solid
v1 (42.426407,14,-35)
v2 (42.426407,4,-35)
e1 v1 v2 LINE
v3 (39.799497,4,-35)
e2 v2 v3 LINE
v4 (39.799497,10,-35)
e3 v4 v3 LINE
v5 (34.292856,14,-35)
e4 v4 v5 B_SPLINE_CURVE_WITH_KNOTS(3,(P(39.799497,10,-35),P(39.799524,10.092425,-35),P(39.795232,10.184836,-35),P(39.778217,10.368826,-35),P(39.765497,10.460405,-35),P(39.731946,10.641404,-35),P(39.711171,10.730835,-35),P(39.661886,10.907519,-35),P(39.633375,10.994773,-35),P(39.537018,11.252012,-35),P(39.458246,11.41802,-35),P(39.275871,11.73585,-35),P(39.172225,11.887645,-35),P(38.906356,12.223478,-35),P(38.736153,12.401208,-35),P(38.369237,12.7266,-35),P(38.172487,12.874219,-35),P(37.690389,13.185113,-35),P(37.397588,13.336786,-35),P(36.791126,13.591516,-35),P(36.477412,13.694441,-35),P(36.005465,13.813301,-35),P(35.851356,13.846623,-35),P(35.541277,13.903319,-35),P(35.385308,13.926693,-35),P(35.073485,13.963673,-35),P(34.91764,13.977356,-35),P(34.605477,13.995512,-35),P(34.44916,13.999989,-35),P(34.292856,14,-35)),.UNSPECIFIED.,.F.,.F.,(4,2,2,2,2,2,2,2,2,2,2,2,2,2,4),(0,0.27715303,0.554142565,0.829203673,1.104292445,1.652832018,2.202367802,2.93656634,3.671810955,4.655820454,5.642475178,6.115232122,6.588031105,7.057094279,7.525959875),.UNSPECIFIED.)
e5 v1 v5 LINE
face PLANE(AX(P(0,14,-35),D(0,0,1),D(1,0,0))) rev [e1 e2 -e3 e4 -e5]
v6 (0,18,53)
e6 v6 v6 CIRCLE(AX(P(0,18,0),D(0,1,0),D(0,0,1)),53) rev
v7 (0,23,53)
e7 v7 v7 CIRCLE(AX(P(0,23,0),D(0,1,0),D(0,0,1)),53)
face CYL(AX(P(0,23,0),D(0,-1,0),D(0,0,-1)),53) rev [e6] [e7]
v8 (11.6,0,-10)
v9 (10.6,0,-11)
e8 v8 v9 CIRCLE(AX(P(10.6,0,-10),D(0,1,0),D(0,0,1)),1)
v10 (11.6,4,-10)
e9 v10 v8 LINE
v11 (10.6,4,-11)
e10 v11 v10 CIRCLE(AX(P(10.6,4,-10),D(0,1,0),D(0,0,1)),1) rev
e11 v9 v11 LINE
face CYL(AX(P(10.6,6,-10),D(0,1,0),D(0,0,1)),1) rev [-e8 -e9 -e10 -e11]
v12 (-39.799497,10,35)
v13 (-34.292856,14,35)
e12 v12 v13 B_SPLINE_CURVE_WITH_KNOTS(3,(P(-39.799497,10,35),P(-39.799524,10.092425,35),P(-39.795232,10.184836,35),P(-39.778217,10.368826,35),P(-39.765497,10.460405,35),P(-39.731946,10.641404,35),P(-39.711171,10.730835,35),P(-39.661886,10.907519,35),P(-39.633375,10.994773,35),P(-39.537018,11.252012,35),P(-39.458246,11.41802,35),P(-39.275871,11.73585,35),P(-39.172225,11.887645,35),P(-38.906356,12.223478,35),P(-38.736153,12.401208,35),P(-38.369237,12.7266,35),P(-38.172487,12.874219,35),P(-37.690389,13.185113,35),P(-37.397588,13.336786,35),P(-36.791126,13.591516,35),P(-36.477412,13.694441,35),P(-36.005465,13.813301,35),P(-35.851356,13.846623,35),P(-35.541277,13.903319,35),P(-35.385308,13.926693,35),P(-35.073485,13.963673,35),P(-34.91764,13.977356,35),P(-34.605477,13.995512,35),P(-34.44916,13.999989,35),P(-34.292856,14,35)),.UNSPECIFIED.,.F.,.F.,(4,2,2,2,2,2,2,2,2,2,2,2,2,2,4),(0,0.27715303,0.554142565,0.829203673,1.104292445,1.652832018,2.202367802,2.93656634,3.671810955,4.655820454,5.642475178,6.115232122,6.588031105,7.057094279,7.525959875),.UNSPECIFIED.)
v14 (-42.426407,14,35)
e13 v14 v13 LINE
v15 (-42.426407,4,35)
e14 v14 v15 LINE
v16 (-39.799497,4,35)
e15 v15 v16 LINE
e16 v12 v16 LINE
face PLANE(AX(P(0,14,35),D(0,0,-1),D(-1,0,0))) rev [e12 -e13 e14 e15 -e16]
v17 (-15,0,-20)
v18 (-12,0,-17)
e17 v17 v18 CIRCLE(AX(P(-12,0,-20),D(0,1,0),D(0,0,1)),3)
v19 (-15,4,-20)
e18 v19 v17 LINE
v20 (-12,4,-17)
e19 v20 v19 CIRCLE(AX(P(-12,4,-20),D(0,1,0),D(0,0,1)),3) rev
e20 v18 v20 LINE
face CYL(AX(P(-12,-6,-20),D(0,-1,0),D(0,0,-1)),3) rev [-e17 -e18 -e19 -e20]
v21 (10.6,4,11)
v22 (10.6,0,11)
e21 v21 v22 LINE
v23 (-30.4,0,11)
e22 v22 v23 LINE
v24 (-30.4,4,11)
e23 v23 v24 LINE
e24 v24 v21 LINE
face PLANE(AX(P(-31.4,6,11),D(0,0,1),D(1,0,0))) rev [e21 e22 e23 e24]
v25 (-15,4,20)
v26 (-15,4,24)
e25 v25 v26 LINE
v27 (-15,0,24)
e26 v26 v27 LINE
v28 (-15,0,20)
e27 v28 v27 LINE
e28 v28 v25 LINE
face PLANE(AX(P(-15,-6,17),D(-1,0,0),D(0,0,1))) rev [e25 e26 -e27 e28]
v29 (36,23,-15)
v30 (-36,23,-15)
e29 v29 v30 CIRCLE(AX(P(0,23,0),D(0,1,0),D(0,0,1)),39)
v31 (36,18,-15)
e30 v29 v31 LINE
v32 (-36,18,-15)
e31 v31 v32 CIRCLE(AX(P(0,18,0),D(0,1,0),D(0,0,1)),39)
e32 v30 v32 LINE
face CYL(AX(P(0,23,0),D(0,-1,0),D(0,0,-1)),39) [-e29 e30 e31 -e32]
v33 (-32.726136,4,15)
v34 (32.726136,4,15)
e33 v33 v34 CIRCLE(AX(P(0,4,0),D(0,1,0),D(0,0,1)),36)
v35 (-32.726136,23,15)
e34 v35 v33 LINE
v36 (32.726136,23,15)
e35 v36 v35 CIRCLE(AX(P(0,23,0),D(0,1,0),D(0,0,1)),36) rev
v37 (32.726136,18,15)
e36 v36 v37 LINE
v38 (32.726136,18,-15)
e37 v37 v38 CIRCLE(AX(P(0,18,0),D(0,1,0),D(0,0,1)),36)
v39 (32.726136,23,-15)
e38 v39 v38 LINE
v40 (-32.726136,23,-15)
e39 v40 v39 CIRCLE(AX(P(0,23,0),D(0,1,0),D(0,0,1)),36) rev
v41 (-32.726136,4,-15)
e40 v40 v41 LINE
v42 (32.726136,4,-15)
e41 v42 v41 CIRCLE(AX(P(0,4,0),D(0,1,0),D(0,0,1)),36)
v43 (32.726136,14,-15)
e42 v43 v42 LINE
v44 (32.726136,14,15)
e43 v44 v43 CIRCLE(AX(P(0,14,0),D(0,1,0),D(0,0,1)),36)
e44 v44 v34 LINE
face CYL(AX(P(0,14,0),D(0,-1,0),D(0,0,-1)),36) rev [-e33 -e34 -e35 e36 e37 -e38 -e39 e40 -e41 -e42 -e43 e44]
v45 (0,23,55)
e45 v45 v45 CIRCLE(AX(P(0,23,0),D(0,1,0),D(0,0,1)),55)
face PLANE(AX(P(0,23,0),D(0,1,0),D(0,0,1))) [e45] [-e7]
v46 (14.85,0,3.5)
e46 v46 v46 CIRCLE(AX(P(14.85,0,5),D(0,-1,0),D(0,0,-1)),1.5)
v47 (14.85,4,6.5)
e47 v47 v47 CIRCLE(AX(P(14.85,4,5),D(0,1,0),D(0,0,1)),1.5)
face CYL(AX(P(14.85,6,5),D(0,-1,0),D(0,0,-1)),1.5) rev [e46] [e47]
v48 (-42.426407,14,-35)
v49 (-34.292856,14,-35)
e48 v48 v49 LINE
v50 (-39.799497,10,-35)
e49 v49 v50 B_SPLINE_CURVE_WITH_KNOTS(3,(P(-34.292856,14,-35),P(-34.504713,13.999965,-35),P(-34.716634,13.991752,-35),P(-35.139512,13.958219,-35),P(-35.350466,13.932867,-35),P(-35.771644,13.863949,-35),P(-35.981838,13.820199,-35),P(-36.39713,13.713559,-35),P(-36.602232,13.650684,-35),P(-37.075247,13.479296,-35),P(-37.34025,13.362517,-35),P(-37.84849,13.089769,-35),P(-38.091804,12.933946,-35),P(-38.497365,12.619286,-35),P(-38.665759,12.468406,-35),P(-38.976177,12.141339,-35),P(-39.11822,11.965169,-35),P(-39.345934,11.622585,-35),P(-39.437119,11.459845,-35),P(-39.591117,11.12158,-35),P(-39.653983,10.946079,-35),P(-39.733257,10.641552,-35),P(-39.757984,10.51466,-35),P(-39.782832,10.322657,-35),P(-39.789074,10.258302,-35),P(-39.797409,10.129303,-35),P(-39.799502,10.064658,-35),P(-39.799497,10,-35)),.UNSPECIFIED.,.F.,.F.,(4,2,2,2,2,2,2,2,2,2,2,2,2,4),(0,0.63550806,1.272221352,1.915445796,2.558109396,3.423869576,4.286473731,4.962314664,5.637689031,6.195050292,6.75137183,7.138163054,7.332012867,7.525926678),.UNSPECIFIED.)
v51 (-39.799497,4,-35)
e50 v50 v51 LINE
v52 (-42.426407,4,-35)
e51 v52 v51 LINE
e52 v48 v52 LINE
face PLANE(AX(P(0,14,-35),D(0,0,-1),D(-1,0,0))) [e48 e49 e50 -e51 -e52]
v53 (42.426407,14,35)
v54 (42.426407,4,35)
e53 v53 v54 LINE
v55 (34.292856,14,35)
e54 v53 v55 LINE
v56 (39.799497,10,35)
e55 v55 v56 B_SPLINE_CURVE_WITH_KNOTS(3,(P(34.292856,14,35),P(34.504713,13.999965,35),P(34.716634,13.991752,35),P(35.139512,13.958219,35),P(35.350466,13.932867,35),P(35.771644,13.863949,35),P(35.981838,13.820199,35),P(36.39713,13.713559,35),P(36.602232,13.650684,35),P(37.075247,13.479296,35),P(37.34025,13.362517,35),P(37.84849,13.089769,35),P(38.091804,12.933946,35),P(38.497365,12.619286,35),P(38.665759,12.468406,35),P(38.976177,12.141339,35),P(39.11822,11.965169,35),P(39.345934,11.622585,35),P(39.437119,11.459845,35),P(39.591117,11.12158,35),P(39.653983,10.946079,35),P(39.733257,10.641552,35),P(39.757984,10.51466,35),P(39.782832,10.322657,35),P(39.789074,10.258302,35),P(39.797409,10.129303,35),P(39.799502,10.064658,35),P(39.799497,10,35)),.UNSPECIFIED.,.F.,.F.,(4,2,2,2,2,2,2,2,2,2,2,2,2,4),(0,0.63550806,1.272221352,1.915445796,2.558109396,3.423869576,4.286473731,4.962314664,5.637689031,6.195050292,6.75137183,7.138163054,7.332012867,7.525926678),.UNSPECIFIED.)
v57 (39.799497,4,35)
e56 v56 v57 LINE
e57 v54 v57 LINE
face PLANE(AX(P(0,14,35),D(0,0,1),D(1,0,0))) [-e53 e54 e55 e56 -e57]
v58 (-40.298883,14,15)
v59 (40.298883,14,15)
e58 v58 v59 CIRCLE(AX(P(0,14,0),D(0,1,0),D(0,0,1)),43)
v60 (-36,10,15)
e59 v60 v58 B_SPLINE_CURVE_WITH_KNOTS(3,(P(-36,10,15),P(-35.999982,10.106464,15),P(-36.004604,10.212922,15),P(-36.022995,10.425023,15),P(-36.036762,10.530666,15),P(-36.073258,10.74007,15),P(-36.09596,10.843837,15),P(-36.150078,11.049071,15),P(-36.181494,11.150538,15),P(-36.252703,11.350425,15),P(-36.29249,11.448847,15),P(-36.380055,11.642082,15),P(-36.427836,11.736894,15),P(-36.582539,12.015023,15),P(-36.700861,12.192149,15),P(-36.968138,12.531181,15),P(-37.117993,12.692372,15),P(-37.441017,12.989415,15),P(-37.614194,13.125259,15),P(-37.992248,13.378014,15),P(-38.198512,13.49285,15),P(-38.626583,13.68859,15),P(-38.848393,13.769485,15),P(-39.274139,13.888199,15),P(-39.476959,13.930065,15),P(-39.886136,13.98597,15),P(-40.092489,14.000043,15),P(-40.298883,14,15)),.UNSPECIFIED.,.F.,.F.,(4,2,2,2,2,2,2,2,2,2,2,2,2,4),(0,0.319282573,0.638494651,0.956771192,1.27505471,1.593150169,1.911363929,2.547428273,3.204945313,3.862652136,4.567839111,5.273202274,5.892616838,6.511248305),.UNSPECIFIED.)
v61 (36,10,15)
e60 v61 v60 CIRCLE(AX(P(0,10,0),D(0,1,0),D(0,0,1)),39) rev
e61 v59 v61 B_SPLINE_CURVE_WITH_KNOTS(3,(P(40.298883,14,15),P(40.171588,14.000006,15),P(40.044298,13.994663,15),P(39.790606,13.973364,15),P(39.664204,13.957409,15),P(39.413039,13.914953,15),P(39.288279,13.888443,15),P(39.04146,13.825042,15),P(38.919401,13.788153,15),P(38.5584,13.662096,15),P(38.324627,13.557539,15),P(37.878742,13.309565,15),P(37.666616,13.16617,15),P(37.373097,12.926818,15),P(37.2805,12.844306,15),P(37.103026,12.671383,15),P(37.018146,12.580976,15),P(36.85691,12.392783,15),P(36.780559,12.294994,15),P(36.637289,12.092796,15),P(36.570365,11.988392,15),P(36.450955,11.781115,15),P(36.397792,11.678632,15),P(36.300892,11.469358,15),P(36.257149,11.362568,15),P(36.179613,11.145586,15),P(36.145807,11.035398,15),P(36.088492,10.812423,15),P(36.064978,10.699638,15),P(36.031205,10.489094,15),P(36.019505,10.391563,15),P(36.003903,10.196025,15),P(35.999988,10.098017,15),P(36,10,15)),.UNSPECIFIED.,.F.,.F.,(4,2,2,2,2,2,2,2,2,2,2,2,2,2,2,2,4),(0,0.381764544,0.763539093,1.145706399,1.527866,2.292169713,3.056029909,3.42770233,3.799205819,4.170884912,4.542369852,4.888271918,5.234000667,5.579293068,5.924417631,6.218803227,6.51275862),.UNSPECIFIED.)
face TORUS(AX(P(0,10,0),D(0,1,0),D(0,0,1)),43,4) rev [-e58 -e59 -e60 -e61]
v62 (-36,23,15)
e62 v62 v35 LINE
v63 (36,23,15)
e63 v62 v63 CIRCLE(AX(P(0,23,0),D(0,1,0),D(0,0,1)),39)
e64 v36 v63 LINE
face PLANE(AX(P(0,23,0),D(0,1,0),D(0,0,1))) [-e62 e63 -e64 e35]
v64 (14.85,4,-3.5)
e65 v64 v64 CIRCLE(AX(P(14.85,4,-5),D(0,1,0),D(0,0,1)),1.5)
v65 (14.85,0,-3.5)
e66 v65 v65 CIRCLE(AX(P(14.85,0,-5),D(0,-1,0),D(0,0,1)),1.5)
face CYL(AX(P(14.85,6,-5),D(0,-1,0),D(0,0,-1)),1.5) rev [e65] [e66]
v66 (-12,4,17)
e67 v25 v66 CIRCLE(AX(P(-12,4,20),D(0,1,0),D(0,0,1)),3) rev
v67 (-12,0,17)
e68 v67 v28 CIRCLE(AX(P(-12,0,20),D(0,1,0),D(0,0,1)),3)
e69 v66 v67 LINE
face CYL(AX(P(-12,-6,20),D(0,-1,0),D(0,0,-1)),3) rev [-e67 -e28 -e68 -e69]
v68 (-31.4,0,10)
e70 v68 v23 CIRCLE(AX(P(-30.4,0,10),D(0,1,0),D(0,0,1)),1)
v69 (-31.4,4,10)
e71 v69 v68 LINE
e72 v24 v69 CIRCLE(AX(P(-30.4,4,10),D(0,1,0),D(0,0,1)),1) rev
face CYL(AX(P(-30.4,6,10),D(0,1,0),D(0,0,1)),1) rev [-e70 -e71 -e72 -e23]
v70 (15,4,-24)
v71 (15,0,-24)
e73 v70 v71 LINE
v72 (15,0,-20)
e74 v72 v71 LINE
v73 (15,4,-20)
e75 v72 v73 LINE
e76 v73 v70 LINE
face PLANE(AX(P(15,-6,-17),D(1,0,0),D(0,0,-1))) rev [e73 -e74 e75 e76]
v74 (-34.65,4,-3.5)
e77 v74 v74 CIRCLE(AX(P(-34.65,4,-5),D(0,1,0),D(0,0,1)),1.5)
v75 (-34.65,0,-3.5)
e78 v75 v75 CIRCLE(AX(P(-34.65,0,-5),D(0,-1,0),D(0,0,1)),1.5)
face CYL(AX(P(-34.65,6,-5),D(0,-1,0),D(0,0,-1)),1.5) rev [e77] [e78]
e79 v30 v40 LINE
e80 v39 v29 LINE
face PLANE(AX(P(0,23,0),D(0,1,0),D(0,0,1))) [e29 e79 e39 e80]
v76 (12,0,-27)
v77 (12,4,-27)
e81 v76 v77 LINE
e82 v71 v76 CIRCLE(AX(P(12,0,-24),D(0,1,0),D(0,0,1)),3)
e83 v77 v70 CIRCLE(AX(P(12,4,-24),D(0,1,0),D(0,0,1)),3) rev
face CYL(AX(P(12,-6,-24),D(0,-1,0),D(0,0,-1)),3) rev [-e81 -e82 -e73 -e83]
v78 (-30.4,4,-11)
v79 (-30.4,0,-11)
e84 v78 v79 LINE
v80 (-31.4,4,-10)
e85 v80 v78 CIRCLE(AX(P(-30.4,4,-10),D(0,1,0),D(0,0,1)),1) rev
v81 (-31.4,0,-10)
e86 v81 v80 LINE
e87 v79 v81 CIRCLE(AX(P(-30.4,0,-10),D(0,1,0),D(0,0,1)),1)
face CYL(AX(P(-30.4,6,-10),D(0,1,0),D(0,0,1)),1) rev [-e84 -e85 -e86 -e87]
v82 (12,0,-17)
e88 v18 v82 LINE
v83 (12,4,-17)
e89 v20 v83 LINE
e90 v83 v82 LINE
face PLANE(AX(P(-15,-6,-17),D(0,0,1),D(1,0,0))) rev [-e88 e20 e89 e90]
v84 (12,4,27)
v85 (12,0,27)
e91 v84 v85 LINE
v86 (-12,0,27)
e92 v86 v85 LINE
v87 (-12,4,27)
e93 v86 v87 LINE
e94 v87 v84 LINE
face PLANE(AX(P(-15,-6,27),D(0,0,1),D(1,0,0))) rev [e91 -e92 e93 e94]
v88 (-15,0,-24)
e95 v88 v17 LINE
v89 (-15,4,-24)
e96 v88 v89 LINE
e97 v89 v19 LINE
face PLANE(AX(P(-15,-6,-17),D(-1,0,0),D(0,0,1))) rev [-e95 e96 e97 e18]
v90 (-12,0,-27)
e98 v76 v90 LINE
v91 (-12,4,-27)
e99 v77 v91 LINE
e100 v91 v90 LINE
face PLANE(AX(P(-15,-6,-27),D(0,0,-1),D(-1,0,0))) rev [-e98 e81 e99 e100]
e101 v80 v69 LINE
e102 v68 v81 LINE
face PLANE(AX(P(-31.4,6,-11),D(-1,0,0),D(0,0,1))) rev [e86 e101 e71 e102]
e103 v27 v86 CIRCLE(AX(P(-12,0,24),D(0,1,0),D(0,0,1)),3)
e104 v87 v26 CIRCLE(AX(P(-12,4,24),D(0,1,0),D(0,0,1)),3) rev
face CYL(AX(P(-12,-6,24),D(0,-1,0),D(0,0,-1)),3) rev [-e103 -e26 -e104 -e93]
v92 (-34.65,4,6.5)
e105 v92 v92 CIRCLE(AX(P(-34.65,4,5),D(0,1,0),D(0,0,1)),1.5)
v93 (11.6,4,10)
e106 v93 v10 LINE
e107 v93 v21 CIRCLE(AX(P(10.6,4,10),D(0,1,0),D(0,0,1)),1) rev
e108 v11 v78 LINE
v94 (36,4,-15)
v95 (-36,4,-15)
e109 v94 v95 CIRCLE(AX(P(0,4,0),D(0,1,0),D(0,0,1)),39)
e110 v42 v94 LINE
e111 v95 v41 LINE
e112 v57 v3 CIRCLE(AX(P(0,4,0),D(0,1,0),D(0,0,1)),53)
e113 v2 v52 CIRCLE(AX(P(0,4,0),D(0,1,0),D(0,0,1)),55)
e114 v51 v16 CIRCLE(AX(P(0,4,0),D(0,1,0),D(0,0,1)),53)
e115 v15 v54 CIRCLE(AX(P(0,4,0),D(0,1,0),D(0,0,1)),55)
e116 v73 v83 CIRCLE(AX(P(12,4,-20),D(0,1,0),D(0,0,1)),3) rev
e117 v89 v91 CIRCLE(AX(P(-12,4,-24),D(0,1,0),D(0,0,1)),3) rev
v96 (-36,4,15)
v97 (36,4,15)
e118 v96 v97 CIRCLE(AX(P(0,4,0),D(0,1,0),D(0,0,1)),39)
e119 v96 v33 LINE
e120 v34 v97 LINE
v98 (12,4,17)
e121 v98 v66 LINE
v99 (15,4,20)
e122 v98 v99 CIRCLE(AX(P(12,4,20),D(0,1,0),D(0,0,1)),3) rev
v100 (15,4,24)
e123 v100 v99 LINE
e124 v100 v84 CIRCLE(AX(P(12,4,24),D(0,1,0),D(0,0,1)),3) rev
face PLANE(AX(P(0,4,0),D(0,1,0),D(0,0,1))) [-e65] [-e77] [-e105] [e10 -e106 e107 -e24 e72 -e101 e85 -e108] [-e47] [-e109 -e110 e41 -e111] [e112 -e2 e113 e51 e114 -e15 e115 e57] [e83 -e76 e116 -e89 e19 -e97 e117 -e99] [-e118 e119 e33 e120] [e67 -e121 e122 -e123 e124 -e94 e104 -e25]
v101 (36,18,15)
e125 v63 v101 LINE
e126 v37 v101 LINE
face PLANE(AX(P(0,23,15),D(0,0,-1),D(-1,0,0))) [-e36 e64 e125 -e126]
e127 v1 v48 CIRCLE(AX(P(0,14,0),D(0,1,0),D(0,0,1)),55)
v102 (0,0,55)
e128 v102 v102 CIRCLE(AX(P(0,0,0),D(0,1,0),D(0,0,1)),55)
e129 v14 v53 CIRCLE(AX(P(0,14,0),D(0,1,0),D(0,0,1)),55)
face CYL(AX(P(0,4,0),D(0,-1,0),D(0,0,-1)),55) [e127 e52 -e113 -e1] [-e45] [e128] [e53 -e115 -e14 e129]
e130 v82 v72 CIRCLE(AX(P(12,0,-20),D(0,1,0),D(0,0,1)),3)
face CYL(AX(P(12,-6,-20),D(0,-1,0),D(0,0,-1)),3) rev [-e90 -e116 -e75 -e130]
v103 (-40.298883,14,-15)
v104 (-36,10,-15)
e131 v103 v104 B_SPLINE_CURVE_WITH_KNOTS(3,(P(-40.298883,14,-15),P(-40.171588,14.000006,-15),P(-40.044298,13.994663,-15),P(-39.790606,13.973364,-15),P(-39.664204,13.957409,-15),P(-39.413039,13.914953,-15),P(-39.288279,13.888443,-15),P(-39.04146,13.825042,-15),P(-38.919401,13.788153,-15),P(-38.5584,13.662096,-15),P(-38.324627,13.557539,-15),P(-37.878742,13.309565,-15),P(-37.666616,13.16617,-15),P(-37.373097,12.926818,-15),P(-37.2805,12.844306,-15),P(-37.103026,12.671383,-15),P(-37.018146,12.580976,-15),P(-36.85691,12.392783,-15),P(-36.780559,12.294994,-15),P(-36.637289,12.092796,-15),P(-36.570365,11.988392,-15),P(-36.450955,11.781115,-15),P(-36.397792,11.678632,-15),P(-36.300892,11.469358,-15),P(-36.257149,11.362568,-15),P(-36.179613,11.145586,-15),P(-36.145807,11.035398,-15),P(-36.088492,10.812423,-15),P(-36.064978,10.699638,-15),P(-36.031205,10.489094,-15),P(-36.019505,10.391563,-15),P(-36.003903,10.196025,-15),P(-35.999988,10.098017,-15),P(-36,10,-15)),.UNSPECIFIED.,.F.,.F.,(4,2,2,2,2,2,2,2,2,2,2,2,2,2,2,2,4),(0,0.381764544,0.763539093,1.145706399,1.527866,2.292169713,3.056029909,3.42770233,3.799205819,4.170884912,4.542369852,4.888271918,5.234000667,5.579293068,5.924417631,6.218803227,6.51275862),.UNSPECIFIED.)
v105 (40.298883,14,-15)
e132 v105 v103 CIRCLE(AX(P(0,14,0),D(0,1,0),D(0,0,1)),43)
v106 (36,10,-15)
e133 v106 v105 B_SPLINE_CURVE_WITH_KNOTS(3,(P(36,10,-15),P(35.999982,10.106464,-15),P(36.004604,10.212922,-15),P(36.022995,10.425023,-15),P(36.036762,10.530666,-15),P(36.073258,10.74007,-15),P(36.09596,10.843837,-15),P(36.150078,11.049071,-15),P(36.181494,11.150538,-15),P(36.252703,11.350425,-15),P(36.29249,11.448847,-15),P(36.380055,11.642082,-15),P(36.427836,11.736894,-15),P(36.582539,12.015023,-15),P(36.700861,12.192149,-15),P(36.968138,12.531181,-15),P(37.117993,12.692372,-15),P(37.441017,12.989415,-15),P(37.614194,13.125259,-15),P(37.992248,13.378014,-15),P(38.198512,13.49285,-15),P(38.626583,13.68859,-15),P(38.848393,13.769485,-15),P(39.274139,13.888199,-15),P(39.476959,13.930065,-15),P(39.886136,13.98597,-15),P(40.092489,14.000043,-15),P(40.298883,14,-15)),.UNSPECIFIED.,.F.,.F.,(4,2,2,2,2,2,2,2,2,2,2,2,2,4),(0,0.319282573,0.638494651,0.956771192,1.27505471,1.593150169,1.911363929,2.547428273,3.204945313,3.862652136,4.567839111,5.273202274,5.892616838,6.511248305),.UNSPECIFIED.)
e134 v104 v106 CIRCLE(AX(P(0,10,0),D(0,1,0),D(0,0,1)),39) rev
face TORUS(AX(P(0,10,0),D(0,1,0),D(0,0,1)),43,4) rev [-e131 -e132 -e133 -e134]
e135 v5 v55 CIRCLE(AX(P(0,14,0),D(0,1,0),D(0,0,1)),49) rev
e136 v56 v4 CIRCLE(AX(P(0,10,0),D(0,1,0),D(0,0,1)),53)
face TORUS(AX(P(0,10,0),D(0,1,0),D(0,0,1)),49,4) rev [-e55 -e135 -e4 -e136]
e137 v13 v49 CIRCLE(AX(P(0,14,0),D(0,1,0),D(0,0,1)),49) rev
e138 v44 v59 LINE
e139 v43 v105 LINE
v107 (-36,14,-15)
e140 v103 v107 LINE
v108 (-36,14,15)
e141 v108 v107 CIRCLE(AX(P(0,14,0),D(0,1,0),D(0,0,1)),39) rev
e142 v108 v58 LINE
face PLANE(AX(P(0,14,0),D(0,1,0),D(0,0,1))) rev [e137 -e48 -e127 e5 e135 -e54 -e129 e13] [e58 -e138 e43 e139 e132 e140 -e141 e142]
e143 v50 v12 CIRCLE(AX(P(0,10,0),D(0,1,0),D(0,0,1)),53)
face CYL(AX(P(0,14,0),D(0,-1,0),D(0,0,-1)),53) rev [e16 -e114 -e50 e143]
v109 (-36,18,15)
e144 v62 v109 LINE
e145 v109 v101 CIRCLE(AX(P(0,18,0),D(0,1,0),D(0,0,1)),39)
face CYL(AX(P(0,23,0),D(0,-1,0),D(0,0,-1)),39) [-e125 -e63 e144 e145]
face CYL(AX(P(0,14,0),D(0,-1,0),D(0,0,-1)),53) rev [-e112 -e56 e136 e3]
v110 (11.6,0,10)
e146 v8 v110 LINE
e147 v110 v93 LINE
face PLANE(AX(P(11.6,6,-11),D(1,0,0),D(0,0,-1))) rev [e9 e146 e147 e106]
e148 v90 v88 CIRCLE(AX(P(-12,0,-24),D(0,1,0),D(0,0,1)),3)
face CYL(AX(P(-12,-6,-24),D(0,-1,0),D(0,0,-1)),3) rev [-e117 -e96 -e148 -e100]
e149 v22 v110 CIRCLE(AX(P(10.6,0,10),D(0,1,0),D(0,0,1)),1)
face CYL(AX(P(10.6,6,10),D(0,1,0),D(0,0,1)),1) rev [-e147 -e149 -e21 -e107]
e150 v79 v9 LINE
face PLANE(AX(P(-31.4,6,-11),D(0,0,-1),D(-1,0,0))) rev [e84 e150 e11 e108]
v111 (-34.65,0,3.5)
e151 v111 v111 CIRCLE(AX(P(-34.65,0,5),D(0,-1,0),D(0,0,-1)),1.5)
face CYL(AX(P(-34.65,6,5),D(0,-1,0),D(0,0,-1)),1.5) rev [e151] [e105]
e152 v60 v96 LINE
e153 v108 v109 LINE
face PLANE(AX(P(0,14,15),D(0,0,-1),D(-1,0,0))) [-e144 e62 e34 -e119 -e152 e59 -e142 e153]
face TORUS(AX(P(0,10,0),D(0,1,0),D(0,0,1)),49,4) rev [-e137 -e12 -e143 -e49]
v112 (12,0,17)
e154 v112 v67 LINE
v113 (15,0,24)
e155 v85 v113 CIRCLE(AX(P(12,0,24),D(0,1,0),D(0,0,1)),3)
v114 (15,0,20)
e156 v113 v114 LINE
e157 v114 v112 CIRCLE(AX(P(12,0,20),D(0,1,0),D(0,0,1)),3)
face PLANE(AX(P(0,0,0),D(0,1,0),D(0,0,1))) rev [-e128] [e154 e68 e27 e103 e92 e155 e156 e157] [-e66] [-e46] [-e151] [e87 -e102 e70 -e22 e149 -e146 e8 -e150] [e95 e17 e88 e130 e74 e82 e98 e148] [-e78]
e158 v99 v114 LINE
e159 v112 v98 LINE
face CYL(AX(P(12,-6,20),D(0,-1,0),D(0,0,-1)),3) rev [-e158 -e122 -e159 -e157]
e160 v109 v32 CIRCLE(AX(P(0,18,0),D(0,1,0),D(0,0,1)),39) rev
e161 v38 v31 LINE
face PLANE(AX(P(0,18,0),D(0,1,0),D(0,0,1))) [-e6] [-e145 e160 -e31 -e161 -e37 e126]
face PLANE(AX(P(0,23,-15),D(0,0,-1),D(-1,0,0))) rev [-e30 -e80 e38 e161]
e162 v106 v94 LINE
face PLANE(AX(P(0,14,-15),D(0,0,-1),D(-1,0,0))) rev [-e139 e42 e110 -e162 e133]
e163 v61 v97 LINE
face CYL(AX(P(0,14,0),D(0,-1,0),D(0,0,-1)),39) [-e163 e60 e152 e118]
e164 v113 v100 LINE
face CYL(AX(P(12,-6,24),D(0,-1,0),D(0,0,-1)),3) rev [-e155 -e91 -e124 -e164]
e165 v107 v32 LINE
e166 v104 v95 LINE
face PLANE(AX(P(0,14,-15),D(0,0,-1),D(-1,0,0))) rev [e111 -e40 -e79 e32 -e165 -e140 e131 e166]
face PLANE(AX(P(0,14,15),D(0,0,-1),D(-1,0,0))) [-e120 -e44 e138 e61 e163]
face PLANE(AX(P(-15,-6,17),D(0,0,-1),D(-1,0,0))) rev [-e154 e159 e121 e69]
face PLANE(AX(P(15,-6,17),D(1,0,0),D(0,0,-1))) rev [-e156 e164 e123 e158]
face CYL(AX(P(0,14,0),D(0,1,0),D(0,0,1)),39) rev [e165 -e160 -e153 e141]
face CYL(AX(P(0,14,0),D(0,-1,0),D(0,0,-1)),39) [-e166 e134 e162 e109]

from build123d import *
from build123d.topology import SkipClean

# Parameters (mm, degrees)
SKETCH_1_R          = 55.00000000000001
EXTRUDE_1_DEPTH     = 4
EXTRUDE_2_DEPTH     = 10
SKETCH_3_R          = 1.499999999999999
SKETCH_3_R_2        = 1.500000000000004
CUT_EXTRUDE_1_DEPTH = 6
FILLET_1_R          = 1
EXTRUDE_3_DEPTH     = 10
SKETCH_5_R          = 55.00000000000001
SKETCH_5_R_2        = 36
EXTRUDE_4_DEPTH     = 4
SKETCH_6_R          = 55.00000000000001
SKETCH_6_R_2        = 53
EXTRUDE_5_DEPTH     = 5
CUT_EXTRUDE_START   = -4
CUT_EXTRUDE_2_DEPTH = 4
FILLET_2_R          = 4
CUT_EXTRUDE_3_DEPTH = 10
FILLET_3_R          = 3


with BuildPart() as part:
    # 草图1 → 凸台-拉伸1 (new body)
    with BuildSketch(Plane(origin=(0, 0, 0), x_dir=(1, 0, 0), z_dir=(0, 1, 0))):
        with Locations(Location((0, 0, 0), (0, 0, 270))):
            Circle(SKETCH_1_R)
    extrude(amount=EXTRUDE_1_DEPTH)

    # 草图2 → 凸台-拉伸2 (add)
    with BuildSketch(Plane(origin=(0, 4, 0), x_dir=(1, 0, 0), z_dir=(0, 1, 0))):
        with BuildLine():
            Line((-39.799497484264805, 35), (-42.42640687119287, 35))
            ThreePointArc((-42.42640687119286, 35.000000000000014), (-55.000000000000014, 6.74e-15), (-42.42640687119287, -35))
            Line((-42.42640687119284, -35), (-39.799497484264776, -35))
            ThreePointArc((-39.79949748426479, -35.00000000000001), (-53, 6.49e-15), (-39.799497484264805, 35))
        make_face()
        with BuildLine():
            ThreePointArc((55.000000000000014, 0), (51.76124215045274, 18.59499424689872), (42.426406871192874, 35))
            Line((42.42640687119287, 35), (39.799497484264805, 35))
            ThreePointArc((39.799497484264805, 35), (49.59018736940825, 18.703296946447246), (53, 0))
            ThreePointArc((53, -1.298e-14), (49.590187369408234, -18.703296946447267), (39.799497484264776, -35.00000000000002))
            Line((39.799497484264776, -35), (42.42640687119284, -35))
            ThreePointArc((42.42640687119285, -35.00000000000002), (51.76124215045274, -18.594994246898718), (55.000000000000014, -1.347e-14))
        make_face()
    extrude(amount=EXTRUDE_2_DEPTH)

    # 草图3 → 切除-拉伸1 (cut)
    with BuildSketch(Plane.XZ):
        with Locations(Location((14.85, 5, 0), (0, 0, 270))):
            Circle(SKETCH_3_R)
        with Locations(Location((14.85, -5, 0), (0, 0, 90))):
            Circle(SKETCH_3_R)
        with Locations(Location((-34.65, 5, 0), (0, 0, 270))):
            Circle(SKETCH_3_R_2)
        with Locations(Location((-34.65, -5, 0), (0, 0, 90))):
            Circle(SKETCH_3_R_2)
        Polygon((-31.4, -10.999999999999996), (11.599999999999998, -10.999999999999996), (11.599999999999994, 11.000000000000004), (-31.4, 11.000000000000004), align=None)
    extrude(amount=-CUT_EXTRUDE_1_DEPTH, mode=Mode.SUBTRACT)

    # 圆角1
    fillet_1_edges = [part.edges().sort_by_distance(p)[0] for p in [
        (11.599999999999994, 2, 11.000000000000004),
        (11.599999999999998, 2, -10.999999999999996),
        (-31.4, 2, -10.999999999999996),
        (-31.4, 2, 11.000000000000004),
    ]]
    fillet(fillet_1_edges, radius=FILLET_1_R)

    # 草图4 → 凸台-拉伸3 (add)
    with BuildSketch(Plane(origin=(0, 4, 0), x_dir=(1, 0, 0), z_dir=(0, 1, 0))):
        with BuildLine():
            ThreePointArc((-32.72613634390714, 14.999999999999996), (-5.79e-15, 36), (32.72613634390714, 14.999999999999996))
            Line((32.72613634390714, 14.999999999999996), (36.00000000000001, 14.999999999999996))
            ThreePointArc((36, 14.999999999999995), (2.39e-15, 39), (-36, 14.999999999999998))
            Line((-36.00000000000001, 14.999999999999996), (-32.72613634390714, 14.999999999999996))
        make_face()
        with BuildLine():
            Line((36, -15.000000000000014), (32.726136343907136, -15.000000000000014))
            ThreePointArc((32.72613634390713, -15.000000000000028), (-6.61e-15, -36), (-32.726136343907136, -15.000000000000016))
            Line((-32.726136343907136, -15.000000000000014), (-36, -15.000000000000014))
            ThreePointArc((-36, -15.000000000000005), (-7.16e-15, -39), (35.99999999999999, -15.000000000000018))
        make_face()
    extrude(amount=EXTRUDE_3_DEPTH)

    # 草图5 → 凸台-拉伸4 (add)
    with SkipClean():  # the faces are left unmerged after this step: merging them gives an invalid solid
        with BuildSketch(Plane(origin=(0, 14, 0), x_dir=(1, 0, 0), z_dir=(0, 1, 0))):
            with Locations(Location((0, 0, 0), (0, 0, 270))):
                Circle(SKETCH_5_R)
            with Locations(Location((0, 0, 0), (0, 0, 155.375681648))):
                Circle(SKETCH_5_R_2, mode=Mode.SUBTRACT)
        extrude(amount=EXTRUDE_4_DEPTH)

    # 草图6 → 凸台-拉伸5 (add)
    # profile 1 of 3: a face of its own
    with SkipClean():  # the faces are left unmerged after this step: merging them gives an invalid solid
        with BuildSketch(Plane(origin=(0, 18.000000000000004, 0), x_dir=(1, 0, 0), z_dir=(0, 1, 0))):
            with Locations(Location((0, 0, 0), (0, 0, 270))):
                Circle(SKETCH_6_R)
            with Locations(Location((0, 0, 0), (0, 0, 270))):
                Circle(SKETCH_6_R_2, mode=Mode.SUBTRACT)
        # profile 2 of 3: a face of its own
        with BuildSketch(Plane(origin=(0, 18.000000000000004, 0), x_dir=(1, 0, 0), z_dir=(0, 1, 0))):
            with BuildLine():
                Line((-36.00000000000001, 14.999999999999996), (-32.72613634390714, 14.999999999999996))
                ThreePointArc((-32.72613634390714, 14.999999999999996), (-5.79e-15, 36), (32.72613634390714, 14.999999999999996))
                Line((32.72613634390714, 14.999999999999996), (36.00000000000001, 14.999999999999996))
                ThreePointArc((36, 14.999999999999995), (2.39e-15, 39), (-36, 14.999999999999998))
            make_face()
        # profile 3 of 3: a face of its own
        with BuildSketch(Plane(origin=(0, 18.000000000000004, 0), x_dir=(1, 0, 0), z_dir=(0, 1, 0))):
            with BuildLine():
                Line((36, -15.000000000000014), (32.726136343907136, -15.000000000000014))
                ThreePointArc((32.72613634390713, -15.000000000000028), (-6.61e-15, -36), (-32.726136343907136, -15.000000000000016))
                Line((-32.726136343907136, -15.000000000000014), (-36, -15.000000000000014))
                ThreePointArc((-36, -15.000000000000005), (-7.16e-15, -39), (35.99999999999999, -15.000000000000018))
            make_face()
        extrude(amount=EXTRUDE_5_DEPTH)

    # 草图7 → 切除-拉伸2 (cut)
    with BuildSketch(Plane(origin=(0, 18.000000000000004, 0), x_dir=(1, 0, 0), z_dir=(0, 1, 0)).offset(CUT_EXTRUDE_START)):
        with BuildLine():
            ThreePointArc((-36, -15.000000000000014), (-39.00000000000001, -4.78e-15), (-36.00000000000001, 14.999999999999996))
            Line((-36.00000000000001, 14.999999999999996), (-32.72613634390714, 14.999999999999996))
            ThreePointArc((-32.72613634390714, 14.999999999999996), (-36, -2.04e-14), (-32.726136343907136, -15.000000000000014))
            Line((-32.726136343907136, -15.000000000000014), (-36, -15.000000000000014))
        make_face()
    extrude(amount=CUT_EXTRUDE_2_DEPTH, mode=Mode.SUBTRACT)

    # 圆角2
    # the kernel refuses this fillet: 4 mm, written as the material it adds along each edge
    with BuildSketch(Plane(origin=(-3.55e-15, 14, -5.33e-15), x_dir=(0.9904724769404064, 0, -0.13771082899879708), z_dir=(0.13771082899879708, 0, 0.9904724769404064))) as fillet_2_piece_1_section:
        with BuildLine():
            CenterArc((39 + FILLET_2_R, -FILLET_2_R), FILLET_2_R, 90, 90)
            Line((39 + FILLET_2_R, 0), (39, 0))
            Line((39, 0), (38.99999999999999, -FILLET_2_R))
        make_face()
    fillet_2_piece_1 = revolve(axis=Axis((-3.55e-15, 14, -5.33e-15), (0, 1, 0)), revolution_arc=164.16919327842925, mode=Mode.PRIVATE)
    fillet_2_piece_1 = split(fillet_2_piece_1, bisect_by=Plane(origin=(0, 12.877029486971129, -14.999999999999996), z_dir=(0, 0, -1)), keep=Keep.TOP, mode=Mode.PRIVATE)
    add(fillet_2_piece_1)
    with BuildSketch(Plane(origin=(3.55e-15, 14, -8.88e-15), x_dir=(-0.9904724769404064, 0, 0.13771082899879786), z_dir=(-0.13771082899879786, 0, -0.9904724769404064))) as fillet_2_piece_2_section:
        with BuildLine():
            CenterArc((38.99999999999986 + FILLET_2_R, -FILLET_2_R), FILLET_2_R, 90, 90)
            Line((38.99999999999986, -FILLET_2_R), (38.99999999999986, 0))
            Line((38.99999999999986, 0), (38.99999999999986 + FILLET_2_R, 0))
        make_face()
    fillet_2_piece_2 = revolve(axis=Axis((3.55e-15, 14, -8.88e-15), (0, 1, 0)), revolution_arc=164.16919327842916, mode=Mode.PRIVATE)
    fillet_2_piece_2 = split(fillet_2_piece_2, bisect_by=Plane(origin=(-7.11e-15, 12.877029483112029, 15.000000000000014), z_dir=(0, 0, 1)), keep=Keep.TOP, mode=Mode.PRIVATE)
    add(fillet_2_piece_2)
    with BuildSketch(Plane(origin=(-4.263e-14, 14, -1.865e-14), x_dir=(0.6136949496452997, 0, 0.7895432279361612), z_dir=(-0.7895432279361612, 0, 0.6136949496452997))) as fillet_2_piece_3_section:
        with BuildLine():
            CenterArc((53.00000000000012 - FILLET_2_R, -FILLET_2_R), FILLET_2_R, 0, 90)
            Line((53.00000000000012, -FILLET_2_R), (53.00000000000012, 0))
            Line((53.00000000000012, 0), (53.00000000000012 - FILLET_2_R, 0))
        make_face()
    fillet_2_piece_3 = revolve(axis=Axis((-4.263e-14, 14, -1.865e-14), (0, 1, 0)), revolution_arc=104.28569181085327, mode=Mode.PRIVATE)
    fillet_2_piece_3 = split(fillet_2_piece_3, bisect_by=Plane(origin=(51.873764077248, 12.873764077247905, -35), z_dir=(0, 0, 1)), keep=Keep.TOP, mode=Mode.PRIVATE)
    fillet_2_piece_3 = split(fillet_2_piece_3, bisect_by=Plane(origin=(51.873764077248, 12.873764077247905, 35), z_dir=(0, 0, -1)), keep=Keep.TOP, mode=Mode.PRIVATE)
    add(fillet_2_piece_3)
    with BuildSketch(Plane(origin=(-1.421e-14, 14, -7.11e-15), x_dir=(-0.6136949496452995, 0, 0.7895432279361616), z_dir=(0.7895432279361616, 0, 0.6136949496452995))) as fillet_2_piece_4_section:
        with BuildLine():
            CenterArc((53.00000000000001 - FILLET_2_R, FILLET_2_R), FILLET_2_R, 270, 90)
            Line((53.00000000000001, FILLET_2_R), (53.00000000000001, 0))
            Line((53.00000000000001, 0), (53.00000000000001 - FILLET_2_R, 0))
        make_face()
    fillet_2_piece_4 = revolve(axis=Axis((-1.421e-14, 14, -7.11e-15), (0, -1, 0)), revolution_arc=104.28569181085335, mode=Mode.PRIVATE)
    fillet_2_piece_4 = split(fillet_2_piece_4, bisect_by=Plane(origin=(-51.87376407724794, 12.873764077247902, -35), z_dir=(0, 0, 1)), keep=Keep.TOP, mode=Mode.PRIVATE)
    fillet_2_piece_4 = split(fillet_2_piece_4, bisect_by=Plane(origin=(-51.87376407724794, 12.873764077247902, 35), z_dir=(0, 0, -1)), keep=Keep.TOP, mode=Mode.PRIVATE)
    add(fillet_2_piece_4)

    # 草图8 → 切除-拉伸3 (cut)
    with BuildSketch(Plane(origin=(0, 4, 0), x_dir=(1, 0, 0), z_dir=(0, 1, 0))):
        Polygon((-14.999999999999998, -27), (15.000000000000002, -27), (15.000000000000004, -16.999999999999996), (-14.999999999999996, -16.999999999999996), align=None)
        Polygon((-14.999999999999996, 16.999999999999996), (15.000000000000004, 16.999999999999996), (15.000000000000002, 27), (-14.999999999999998, 27), align=None)
    extrude(amount=-CUT_EXTRUDE_3_DEPTH, mode=Mode.SUBTRACT)

    # 圆角3
    fillet_3_edges = [part.edges().sort_by_distance(p)[0] for p in [
        (15.000000000000002, 2, -27),
        (15.000000000000004, 2, -16.999999999999996),
        (-14.999999999999996, 2, -16.999999999999996),
        (-14.999999999999998, 2, -27),
        (-14.999999999999998, 2, 27),
        (-14.999999999999996, 2, 16.999999999999996),
        (15.000000000000004, 2, 16.999999999999996),
        (15.000000000000002, 2, 27),
    ]]
    fillet(fillet_3_edges, radius=FILLET_3_R)


solid = part.part
